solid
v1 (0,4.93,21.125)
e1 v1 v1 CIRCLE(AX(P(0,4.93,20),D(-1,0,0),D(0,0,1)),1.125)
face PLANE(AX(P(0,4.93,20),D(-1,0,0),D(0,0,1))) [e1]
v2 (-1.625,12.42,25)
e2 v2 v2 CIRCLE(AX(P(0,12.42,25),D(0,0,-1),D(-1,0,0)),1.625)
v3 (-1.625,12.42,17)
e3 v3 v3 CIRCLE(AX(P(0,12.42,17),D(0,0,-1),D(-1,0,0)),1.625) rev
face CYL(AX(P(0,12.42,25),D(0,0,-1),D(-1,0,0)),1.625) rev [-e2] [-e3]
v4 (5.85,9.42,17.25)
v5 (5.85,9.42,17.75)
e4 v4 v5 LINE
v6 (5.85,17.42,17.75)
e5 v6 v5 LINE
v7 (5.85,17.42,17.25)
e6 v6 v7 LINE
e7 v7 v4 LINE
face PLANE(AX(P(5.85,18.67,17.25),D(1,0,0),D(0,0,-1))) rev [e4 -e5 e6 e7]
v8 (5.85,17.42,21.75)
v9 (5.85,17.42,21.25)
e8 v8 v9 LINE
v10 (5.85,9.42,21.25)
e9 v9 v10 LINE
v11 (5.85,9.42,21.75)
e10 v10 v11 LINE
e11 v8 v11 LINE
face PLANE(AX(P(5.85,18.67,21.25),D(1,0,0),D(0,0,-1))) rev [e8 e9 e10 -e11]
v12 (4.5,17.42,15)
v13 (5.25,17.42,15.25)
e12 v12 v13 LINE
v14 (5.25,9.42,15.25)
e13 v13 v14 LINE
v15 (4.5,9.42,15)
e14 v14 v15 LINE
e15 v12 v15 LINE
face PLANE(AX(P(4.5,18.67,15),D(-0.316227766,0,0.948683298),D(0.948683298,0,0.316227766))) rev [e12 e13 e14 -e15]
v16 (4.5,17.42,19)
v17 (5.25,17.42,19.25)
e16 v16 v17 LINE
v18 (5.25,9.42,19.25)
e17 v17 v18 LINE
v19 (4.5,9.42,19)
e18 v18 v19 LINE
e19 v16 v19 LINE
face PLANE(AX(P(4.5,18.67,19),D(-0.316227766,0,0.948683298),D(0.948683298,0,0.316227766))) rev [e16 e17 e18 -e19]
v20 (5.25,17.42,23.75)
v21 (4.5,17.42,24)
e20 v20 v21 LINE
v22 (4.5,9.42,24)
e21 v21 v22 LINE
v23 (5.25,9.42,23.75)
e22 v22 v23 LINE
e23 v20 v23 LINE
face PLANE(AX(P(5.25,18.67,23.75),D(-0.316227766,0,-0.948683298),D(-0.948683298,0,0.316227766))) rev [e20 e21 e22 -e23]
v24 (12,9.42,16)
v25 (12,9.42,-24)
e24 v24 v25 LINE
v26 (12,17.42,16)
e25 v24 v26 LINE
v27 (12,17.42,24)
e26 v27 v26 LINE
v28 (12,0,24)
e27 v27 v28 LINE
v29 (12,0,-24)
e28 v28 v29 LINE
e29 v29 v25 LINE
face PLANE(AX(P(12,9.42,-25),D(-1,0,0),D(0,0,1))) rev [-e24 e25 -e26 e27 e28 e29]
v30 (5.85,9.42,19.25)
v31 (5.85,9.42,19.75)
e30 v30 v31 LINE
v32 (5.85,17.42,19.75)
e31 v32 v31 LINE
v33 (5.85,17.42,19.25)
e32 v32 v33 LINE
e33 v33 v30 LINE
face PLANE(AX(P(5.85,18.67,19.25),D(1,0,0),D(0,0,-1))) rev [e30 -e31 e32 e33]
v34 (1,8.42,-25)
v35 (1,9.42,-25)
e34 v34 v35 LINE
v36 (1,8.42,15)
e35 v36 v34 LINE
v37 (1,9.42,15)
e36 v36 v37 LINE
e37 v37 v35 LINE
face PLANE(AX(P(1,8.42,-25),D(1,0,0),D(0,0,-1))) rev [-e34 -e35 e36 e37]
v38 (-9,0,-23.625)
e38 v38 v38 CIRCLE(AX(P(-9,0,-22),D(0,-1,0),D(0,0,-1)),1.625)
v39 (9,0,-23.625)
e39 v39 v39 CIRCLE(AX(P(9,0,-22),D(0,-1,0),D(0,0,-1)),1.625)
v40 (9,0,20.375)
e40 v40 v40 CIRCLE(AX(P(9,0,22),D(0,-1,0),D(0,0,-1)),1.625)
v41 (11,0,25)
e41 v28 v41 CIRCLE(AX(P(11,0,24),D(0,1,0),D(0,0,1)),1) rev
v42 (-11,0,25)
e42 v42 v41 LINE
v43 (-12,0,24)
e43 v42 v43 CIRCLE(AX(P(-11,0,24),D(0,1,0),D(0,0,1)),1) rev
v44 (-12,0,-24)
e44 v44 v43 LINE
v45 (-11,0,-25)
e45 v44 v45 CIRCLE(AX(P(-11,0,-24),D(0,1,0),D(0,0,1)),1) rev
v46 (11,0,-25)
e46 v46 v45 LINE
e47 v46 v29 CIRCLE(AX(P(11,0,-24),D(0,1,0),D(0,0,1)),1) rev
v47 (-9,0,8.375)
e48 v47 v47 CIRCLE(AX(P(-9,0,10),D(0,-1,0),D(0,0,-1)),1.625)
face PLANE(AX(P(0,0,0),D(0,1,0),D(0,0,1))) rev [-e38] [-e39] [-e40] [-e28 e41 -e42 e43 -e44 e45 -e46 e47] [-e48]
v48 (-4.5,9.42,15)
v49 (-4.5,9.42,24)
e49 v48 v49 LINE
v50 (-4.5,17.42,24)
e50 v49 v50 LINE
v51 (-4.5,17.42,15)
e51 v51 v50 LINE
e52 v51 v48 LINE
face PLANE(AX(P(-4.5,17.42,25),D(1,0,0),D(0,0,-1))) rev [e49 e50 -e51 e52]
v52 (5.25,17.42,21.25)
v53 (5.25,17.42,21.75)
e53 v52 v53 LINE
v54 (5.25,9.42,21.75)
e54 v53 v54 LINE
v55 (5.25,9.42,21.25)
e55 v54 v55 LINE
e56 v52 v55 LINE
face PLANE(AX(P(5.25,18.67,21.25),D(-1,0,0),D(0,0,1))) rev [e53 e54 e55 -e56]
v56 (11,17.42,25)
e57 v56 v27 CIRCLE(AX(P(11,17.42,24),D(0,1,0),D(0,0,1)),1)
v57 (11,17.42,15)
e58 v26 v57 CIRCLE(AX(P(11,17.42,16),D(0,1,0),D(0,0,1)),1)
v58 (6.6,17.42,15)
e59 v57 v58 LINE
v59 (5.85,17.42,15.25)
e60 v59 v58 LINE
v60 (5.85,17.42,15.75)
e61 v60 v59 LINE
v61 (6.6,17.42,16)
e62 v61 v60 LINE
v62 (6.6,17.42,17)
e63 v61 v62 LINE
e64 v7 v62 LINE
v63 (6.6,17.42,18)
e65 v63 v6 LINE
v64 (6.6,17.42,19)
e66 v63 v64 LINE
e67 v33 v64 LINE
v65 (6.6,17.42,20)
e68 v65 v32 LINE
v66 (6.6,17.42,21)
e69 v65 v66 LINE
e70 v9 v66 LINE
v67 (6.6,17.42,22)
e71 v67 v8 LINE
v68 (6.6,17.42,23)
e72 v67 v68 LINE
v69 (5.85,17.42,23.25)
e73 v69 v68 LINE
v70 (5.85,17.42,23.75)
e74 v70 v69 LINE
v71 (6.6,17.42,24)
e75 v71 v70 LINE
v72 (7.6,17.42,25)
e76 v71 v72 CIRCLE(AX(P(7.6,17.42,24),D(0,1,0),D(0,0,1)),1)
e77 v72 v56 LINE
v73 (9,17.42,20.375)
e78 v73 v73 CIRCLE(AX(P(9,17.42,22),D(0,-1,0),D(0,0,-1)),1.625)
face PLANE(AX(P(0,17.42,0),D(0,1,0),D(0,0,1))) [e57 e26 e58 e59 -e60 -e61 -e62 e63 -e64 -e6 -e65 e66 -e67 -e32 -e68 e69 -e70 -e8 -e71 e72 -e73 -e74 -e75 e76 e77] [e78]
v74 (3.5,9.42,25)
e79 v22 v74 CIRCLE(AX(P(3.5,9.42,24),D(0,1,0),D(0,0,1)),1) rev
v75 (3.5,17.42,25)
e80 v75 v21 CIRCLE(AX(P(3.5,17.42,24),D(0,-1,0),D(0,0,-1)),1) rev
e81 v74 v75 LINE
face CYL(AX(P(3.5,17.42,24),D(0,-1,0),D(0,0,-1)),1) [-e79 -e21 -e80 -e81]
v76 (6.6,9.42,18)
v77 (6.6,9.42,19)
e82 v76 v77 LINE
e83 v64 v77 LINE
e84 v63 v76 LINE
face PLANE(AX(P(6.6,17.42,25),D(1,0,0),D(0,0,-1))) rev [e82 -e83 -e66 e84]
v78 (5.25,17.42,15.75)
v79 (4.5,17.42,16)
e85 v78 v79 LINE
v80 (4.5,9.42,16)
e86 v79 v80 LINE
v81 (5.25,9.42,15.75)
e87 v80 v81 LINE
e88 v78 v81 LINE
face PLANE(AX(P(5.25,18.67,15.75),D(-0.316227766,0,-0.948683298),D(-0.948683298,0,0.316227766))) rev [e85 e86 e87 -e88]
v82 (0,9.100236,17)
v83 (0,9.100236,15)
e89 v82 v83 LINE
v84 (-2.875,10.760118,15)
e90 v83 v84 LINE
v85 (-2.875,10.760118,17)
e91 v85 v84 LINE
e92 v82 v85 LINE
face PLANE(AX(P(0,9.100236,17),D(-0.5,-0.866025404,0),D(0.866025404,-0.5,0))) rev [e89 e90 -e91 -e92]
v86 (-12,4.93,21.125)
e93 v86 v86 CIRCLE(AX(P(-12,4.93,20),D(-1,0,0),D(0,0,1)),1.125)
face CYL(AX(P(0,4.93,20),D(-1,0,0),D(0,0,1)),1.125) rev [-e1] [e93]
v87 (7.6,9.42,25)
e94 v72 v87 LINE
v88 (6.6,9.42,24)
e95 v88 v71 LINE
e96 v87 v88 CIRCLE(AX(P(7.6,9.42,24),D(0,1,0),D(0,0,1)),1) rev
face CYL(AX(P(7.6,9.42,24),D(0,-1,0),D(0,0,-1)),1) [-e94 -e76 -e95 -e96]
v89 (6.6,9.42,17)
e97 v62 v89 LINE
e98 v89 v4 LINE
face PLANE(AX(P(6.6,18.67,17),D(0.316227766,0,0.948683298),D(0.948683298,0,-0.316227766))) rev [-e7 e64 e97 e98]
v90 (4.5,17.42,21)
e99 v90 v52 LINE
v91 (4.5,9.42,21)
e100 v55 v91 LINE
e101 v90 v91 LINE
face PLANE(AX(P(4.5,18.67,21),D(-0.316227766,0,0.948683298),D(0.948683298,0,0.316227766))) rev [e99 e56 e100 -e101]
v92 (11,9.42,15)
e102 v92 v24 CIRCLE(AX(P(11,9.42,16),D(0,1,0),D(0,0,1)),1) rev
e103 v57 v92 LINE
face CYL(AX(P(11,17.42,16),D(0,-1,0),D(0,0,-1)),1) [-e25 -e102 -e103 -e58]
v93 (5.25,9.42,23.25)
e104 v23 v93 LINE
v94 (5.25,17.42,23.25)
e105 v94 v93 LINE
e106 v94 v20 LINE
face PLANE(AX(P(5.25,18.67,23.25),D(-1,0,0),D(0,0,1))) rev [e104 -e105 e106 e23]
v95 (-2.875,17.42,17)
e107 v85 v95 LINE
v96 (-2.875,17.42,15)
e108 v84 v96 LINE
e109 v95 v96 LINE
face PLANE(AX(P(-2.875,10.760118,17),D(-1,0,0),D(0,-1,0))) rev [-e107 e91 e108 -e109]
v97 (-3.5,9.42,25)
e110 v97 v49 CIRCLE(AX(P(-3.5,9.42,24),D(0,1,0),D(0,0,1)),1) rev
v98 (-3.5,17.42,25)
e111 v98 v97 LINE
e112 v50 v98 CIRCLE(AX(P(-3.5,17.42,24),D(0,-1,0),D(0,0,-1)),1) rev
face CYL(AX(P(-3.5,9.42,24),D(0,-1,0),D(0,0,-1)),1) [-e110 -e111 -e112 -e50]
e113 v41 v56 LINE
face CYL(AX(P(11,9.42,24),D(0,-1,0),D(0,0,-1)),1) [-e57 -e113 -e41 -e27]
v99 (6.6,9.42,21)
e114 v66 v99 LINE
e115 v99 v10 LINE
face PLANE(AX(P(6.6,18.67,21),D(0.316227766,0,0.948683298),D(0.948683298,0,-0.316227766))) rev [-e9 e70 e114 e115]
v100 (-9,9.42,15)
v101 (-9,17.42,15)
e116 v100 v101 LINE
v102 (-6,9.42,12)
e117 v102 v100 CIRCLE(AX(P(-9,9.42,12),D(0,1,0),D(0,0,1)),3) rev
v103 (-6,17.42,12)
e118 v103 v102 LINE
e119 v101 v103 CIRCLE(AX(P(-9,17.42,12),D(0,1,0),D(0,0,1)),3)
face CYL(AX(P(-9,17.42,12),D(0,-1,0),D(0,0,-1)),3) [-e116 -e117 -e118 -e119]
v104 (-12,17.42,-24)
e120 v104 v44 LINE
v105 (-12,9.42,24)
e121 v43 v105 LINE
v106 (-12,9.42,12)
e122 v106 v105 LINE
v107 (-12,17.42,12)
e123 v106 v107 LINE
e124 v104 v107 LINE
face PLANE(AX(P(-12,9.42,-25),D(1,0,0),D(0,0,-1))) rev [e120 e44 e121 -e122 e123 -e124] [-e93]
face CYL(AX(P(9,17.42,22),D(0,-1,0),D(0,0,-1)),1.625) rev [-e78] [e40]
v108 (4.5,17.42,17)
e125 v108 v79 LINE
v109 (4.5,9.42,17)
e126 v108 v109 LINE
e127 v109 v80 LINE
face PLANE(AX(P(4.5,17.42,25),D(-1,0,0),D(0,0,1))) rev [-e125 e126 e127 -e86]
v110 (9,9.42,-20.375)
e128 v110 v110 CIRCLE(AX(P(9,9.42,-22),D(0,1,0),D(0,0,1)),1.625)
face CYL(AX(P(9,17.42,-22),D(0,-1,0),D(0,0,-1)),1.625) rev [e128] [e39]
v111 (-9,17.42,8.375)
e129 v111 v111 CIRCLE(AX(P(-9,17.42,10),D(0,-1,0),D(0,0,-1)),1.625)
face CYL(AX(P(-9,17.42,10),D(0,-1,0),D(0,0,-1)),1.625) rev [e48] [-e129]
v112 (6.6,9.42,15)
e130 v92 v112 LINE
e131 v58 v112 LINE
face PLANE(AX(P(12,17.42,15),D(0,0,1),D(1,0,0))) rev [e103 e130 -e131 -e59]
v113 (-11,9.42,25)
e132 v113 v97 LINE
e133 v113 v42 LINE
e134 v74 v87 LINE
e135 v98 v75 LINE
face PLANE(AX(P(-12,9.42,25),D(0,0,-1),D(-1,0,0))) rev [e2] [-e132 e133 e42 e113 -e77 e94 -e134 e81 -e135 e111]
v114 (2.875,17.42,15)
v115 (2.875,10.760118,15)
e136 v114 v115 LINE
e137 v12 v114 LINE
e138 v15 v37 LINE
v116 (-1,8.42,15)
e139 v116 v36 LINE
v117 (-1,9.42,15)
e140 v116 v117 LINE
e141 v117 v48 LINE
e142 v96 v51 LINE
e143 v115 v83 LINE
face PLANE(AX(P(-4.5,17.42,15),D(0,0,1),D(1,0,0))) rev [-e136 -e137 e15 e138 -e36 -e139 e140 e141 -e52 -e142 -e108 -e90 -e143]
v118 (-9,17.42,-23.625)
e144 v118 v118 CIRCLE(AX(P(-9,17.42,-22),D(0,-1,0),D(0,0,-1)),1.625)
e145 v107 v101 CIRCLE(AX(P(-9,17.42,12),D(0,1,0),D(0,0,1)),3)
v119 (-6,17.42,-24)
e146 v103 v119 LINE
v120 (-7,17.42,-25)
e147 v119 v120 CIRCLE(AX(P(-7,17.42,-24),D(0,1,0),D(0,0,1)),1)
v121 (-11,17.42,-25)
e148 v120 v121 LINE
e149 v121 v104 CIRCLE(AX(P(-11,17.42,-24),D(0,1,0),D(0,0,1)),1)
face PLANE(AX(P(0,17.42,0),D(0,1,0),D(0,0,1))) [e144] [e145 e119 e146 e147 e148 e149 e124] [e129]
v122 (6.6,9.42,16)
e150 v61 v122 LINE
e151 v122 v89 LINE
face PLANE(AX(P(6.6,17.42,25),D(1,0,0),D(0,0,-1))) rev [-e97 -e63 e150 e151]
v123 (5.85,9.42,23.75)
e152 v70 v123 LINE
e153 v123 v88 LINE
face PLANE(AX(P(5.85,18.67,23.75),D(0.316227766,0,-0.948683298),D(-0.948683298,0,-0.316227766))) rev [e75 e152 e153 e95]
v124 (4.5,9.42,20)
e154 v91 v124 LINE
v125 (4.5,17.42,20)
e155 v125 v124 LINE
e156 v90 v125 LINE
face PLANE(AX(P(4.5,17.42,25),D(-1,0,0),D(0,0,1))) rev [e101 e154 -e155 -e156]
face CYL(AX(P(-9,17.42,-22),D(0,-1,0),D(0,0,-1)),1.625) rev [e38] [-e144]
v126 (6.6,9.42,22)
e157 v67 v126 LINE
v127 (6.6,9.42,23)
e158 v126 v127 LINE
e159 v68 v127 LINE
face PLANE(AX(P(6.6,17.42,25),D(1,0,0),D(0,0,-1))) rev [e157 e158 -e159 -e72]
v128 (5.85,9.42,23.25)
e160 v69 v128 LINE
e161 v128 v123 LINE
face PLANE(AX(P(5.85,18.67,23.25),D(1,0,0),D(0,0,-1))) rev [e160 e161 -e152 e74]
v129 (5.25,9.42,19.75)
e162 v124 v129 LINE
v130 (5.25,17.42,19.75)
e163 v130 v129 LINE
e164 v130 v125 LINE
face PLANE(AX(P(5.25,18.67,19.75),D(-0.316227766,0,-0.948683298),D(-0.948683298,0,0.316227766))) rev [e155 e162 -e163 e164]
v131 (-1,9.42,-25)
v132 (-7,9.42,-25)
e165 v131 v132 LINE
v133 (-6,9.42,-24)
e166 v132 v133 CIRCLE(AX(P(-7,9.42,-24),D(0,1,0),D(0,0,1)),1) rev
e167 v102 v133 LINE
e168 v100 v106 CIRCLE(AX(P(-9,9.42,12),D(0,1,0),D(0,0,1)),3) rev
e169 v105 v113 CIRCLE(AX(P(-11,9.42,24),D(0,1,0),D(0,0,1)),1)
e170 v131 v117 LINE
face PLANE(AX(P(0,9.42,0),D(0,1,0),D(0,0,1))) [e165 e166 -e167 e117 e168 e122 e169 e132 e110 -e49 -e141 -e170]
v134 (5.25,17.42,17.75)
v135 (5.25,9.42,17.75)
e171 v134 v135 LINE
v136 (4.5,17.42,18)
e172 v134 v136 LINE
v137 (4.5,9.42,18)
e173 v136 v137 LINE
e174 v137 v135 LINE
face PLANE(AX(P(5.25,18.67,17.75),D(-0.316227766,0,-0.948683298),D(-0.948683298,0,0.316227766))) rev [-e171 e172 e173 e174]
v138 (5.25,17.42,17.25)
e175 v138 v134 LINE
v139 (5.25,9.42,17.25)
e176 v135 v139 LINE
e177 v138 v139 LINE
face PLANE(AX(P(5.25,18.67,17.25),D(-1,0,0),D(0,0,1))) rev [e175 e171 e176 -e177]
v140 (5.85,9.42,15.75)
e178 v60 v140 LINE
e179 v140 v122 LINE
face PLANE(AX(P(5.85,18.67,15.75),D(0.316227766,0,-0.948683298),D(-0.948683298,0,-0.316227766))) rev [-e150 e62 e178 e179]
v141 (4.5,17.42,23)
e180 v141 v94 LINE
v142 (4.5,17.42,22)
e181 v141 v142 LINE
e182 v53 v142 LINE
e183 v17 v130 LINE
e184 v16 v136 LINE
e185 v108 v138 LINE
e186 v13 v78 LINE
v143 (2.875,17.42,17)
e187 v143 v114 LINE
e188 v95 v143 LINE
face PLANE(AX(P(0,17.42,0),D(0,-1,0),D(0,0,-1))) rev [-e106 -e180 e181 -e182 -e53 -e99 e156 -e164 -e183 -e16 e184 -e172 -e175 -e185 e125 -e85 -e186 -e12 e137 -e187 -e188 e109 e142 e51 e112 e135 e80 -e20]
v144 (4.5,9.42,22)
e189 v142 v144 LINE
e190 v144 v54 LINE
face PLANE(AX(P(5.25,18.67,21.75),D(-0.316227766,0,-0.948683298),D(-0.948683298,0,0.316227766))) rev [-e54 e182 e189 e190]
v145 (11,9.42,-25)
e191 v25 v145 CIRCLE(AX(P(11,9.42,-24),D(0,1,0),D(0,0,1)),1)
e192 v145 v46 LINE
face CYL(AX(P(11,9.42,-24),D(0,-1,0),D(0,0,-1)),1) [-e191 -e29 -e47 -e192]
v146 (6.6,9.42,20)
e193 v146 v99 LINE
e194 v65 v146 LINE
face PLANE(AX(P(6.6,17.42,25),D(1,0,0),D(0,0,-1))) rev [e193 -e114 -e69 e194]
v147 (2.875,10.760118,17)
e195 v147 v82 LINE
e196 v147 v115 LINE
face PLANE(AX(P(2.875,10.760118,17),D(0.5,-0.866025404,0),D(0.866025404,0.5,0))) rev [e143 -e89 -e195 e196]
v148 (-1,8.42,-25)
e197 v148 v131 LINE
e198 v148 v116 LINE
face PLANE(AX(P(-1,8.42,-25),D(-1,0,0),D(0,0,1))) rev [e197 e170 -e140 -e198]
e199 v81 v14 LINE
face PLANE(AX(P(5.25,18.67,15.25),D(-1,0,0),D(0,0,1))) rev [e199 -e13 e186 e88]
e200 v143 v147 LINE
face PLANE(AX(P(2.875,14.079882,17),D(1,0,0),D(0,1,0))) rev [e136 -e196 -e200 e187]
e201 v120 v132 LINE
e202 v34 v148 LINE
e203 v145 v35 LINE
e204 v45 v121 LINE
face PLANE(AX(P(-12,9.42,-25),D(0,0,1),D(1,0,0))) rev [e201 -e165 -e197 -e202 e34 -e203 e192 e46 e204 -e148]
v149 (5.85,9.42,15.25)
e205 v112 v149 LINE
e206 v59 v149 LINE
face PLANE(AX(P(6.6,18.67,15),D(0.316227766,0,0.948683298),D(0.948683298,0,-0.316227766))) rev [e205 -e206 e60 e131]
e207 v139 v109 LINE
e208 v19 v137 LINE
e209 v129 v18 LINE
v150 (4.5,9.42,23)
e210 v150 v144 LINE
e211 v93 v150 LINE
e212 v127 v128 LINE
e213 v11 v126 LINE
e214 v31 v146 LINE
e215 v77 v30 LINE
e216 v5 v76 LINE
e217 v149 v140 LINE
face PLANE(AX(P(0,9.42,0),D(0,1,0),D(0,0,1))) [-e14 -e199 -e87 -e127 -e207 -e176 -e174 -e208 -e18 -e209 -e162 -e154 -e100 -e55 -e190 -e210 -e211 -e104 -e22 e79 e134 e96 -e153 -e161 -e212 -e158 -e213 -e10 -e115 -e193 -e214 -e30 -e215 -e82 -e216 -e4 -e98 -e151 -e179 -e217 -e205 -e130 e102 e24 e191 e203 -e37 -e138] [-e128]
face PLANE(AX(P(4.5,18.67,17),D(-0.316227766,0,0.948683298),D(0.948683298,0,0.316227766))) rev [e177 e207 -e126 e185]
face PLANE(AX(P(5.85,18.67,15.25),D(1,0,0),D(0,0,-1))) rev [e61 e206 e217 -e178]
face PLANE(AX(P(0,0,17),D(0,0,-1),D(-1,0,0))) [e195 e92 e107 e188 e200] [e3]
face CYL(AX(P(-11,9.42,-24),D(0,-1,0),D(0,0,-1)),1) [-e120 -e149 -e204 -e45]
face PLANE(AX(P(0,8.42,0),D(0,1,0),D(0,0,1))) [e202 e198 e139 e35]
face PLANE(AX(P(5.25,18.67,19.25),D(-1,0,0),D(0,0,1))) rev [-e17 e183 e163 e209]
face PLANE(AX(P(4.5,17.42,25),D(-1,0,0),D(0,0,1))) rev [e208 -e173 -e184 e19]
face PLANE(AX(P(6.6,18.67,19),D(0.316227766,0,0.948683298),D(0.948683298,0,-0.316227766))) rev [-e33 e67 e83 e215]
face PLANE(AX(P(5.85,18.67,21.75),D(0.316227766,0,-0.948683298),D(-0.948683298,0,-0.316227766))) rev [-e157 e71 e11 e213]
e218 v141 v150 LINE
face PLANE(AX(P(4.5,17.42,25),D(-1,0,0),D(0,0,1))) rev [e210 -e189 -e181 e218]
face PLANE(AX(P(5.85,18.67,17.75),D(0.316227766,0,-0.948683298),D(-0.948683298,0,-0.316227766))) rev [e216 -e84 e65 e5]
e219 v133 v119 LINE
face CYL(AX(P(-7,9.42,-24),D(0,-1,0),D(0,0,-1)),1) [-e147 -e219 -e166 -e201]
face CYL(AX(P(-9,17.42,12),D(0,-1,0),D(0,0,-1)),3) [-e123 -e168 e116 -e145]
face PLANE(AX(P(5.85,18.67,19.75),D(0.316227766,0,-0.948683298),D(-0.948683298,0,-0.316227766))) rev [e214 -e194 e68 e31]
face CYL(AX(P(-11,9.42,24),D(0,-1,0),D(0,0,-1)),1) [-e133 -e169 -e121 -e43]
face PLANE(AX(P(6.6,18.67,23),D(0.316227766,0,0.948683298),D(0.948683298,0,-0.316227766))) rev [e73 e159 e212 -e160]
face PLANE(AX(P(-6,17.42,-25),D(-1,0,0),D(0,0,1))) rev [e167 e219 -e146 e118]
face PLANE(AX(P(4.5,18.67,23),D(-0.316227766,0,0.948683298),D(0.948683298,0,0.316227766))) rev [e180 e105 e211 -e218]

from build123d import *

# Parameters (mm, degrees)
SKETCH1_W           = 24
SKETCH1_H           = 50
BOSS_EXTRUDE1_DEPTH = 9.42
SKETCH2_W           = 6
SKETCH2_H           = 40
SKETCH2_W_2         = 9
SKETCH2_H_2         = 10
SKETCH2_W_3         = 5.4
BOSS_EXTRUDE2_DEPTH = 8
FILLET1_R           = 3
SKETCH4_R           = 1.625
CUT_EXTRUDE2_DEPTH  = 46.248827609
CUT_EXTRUDE3_DEPTH  = 2
SKETCH6_W           = 2
SKETCH6_H           = 40
CUT_EXTRUDE4_DEPTH  = 1
SKETCH7_R           = 1.125
CUT_EXTRUDE5_DEPTH  = 12
SKETCH9_R           = 1.625
CUT_EXTRUDE6_DEPTH  = 33.748380113
FILLET2_R           = 1
BOSS_EXTRUDE3_DEPTH = 8
LPATTERN1_COUNT     = 5
LPATTERN1_PITCH     = 2


with BuildPart() as part:
    # Sketch1 → Boss-Extrude1 (new body)
    with BuildSketch(Plane(origin=(0, 0, 0), x_dir=(1, 0, 0), z_dir=(0, 1, 0))):
        Rectangle(SKETCH1_W, SKETCH1_H)
    extrude(amount=BOSS_EXTRUDE1_DEPTH)

    # Sketch2 → Boss-Extrude2 (add)
    with BuildSketch(Plane(origin=(0, 9.42, 0), x_dir=(1, 0, 0), z_dir=(0, 1, 0))):
        with Locations((-9, 5)):
            Rectangle(SKETCH2_W, SKETCH2_H)
        with Locations((0, -20)):
            Rectangle(SKETCH2_W_2, SKETCH2_H_2)
        with Locations((9.3, -20)):
            Rectangle(SKETCH2_W_3, SKETCH2_H_2)
    extrude(amount=BOSS_EXTRUDE2_DEPTH)

    # Fillet1
    fillet1_edges = [part.edges().sort_by_distance(p)[0] for p in [
        (-12, 13.42, 15),
        (-6, 13.42, 15),
    ]]
    fillet(fillet1_edges, radius=FILLET1_R - 0.0001)  # a hair under: the kernel refuses the full size

    # Sketch4 → Cut-Extrude2 (cut, through all)
    with BuildSketch(Plane(origin=(0, 0, 15), x_dir=(-1, 0, 0), z_dir=(0, 0, -1))):
        with Locations((0, 12.42)):
            Circle(SKETCH4_R)
    extrude(amount=-CUT_EXTRUDE2_DEPTH, mode=Mode.SUBTRACT)

    # Sketch5 → Cut-Extrude3 (cut)
    with BuildSketch(Plane(origin=(0, 0, 15), x_dir=(-1, 0, 0), z_dir=(0, 0, -1))):
        Polygon((-2.875, 14.079882024), (-2.875, 17.42), (2.875, 17.42), (2.875, 14.079882024), (2.875, 10.760117976), (0, 9.100235952), (-2.875, 10.760117976), align=None)
    extrude(amount=-CUT_EXTRUDE3_DEPTH, mode=Mode.SUBTRACT)

    # Sketch6 → Cut-Extrude4 (cut)
    with BuildSketch(Plane(origin=(0, 9.42, 0), x_dir=(1, 0, 0), z_dir=(0, 1, 0))):
        with Locations((0, 5)):
            Rectangle(SKETCH6_W, SKETCH6_H)
    extrude(amount=-CUT_EXTRUDE4_DEPTH, mode=Mode.SUBTRACT)

    # Sketch7 → Cut-Extrude5 (cut)
    with BuildSketch(Plane.ZY.offset(12)):
        with Locations((20, 4.93)):
            Circle(SKETCH7_R)
    extrude(amount=-CUT_EXTRUDE5_DEPTH, mode=Mode.SUBTRACT)

    # Sketch9 → Cut-Extrude6 (cut, through all)
    with BuildSketch(Plane.XZ):
        with Locations(Location((9, 22, 0), (0, 0, 270))):
            Circle(SKETCH9_R)
        with Locations(Location((9, -22, 0), (0, 0, 270))):
            Circle(SKETCH9_R)
        with Locations(Location((-9, -22, 0), (0, 0, 270))):
            Circle(SKETCH9_R)
        with Locations(Location((-9, 10, 0), (0, 0, 270))):
            Circle(SKETCH9_R)
    extrude(amount=-CUT_EXTRUDE6_DEPTH, mode=Mode.SUBTRACT)

    # Fillet2
    fillet2_edges = [part.edges().sort_by_distance(p)[0] for p in [
        (-6, 13.42, -25),
        (-4.5, 13.42, 25),
        (4.5, 13.42, 25),
        (12, 13.42, 15),
        (6.6, 13.42, 25),
        (-12, 8.71, -25),
        (12, 4.71, -25),
        (12, 8.71, 25),
        (-12, 4.71, 25),
    ]]
    fillet(fillet2_edges, radius=FILLET2_R)

    # Sketch10 → Boss-Extrude3 (add)
    with BuildSketch(Plane(origin=(0, 9.42, 0), x_dir=(1, 0, 0), z_dir=(0, 1, 0))):
        Polygon((4.5, -24), (4.5, -23), (5.25, -23.25), (5.25, -23.75), align=None)
        Polygon((6.6, -24), (6.6, -23), (5.85, -23.25), (5.85, -23.75), align=None)
    boss_extrude3 = extrude(amount=BOSS_EXTRUDE3_DEPTH)

    # LPattern1: Boss-Extrude3 ×5
    with Locations(*[(0, 0, -i * LPATTERN1_PITCH) for i in range(1, LPATTERN1_COUNT)]):
        add(boss_extrude3)


solid = part.part
